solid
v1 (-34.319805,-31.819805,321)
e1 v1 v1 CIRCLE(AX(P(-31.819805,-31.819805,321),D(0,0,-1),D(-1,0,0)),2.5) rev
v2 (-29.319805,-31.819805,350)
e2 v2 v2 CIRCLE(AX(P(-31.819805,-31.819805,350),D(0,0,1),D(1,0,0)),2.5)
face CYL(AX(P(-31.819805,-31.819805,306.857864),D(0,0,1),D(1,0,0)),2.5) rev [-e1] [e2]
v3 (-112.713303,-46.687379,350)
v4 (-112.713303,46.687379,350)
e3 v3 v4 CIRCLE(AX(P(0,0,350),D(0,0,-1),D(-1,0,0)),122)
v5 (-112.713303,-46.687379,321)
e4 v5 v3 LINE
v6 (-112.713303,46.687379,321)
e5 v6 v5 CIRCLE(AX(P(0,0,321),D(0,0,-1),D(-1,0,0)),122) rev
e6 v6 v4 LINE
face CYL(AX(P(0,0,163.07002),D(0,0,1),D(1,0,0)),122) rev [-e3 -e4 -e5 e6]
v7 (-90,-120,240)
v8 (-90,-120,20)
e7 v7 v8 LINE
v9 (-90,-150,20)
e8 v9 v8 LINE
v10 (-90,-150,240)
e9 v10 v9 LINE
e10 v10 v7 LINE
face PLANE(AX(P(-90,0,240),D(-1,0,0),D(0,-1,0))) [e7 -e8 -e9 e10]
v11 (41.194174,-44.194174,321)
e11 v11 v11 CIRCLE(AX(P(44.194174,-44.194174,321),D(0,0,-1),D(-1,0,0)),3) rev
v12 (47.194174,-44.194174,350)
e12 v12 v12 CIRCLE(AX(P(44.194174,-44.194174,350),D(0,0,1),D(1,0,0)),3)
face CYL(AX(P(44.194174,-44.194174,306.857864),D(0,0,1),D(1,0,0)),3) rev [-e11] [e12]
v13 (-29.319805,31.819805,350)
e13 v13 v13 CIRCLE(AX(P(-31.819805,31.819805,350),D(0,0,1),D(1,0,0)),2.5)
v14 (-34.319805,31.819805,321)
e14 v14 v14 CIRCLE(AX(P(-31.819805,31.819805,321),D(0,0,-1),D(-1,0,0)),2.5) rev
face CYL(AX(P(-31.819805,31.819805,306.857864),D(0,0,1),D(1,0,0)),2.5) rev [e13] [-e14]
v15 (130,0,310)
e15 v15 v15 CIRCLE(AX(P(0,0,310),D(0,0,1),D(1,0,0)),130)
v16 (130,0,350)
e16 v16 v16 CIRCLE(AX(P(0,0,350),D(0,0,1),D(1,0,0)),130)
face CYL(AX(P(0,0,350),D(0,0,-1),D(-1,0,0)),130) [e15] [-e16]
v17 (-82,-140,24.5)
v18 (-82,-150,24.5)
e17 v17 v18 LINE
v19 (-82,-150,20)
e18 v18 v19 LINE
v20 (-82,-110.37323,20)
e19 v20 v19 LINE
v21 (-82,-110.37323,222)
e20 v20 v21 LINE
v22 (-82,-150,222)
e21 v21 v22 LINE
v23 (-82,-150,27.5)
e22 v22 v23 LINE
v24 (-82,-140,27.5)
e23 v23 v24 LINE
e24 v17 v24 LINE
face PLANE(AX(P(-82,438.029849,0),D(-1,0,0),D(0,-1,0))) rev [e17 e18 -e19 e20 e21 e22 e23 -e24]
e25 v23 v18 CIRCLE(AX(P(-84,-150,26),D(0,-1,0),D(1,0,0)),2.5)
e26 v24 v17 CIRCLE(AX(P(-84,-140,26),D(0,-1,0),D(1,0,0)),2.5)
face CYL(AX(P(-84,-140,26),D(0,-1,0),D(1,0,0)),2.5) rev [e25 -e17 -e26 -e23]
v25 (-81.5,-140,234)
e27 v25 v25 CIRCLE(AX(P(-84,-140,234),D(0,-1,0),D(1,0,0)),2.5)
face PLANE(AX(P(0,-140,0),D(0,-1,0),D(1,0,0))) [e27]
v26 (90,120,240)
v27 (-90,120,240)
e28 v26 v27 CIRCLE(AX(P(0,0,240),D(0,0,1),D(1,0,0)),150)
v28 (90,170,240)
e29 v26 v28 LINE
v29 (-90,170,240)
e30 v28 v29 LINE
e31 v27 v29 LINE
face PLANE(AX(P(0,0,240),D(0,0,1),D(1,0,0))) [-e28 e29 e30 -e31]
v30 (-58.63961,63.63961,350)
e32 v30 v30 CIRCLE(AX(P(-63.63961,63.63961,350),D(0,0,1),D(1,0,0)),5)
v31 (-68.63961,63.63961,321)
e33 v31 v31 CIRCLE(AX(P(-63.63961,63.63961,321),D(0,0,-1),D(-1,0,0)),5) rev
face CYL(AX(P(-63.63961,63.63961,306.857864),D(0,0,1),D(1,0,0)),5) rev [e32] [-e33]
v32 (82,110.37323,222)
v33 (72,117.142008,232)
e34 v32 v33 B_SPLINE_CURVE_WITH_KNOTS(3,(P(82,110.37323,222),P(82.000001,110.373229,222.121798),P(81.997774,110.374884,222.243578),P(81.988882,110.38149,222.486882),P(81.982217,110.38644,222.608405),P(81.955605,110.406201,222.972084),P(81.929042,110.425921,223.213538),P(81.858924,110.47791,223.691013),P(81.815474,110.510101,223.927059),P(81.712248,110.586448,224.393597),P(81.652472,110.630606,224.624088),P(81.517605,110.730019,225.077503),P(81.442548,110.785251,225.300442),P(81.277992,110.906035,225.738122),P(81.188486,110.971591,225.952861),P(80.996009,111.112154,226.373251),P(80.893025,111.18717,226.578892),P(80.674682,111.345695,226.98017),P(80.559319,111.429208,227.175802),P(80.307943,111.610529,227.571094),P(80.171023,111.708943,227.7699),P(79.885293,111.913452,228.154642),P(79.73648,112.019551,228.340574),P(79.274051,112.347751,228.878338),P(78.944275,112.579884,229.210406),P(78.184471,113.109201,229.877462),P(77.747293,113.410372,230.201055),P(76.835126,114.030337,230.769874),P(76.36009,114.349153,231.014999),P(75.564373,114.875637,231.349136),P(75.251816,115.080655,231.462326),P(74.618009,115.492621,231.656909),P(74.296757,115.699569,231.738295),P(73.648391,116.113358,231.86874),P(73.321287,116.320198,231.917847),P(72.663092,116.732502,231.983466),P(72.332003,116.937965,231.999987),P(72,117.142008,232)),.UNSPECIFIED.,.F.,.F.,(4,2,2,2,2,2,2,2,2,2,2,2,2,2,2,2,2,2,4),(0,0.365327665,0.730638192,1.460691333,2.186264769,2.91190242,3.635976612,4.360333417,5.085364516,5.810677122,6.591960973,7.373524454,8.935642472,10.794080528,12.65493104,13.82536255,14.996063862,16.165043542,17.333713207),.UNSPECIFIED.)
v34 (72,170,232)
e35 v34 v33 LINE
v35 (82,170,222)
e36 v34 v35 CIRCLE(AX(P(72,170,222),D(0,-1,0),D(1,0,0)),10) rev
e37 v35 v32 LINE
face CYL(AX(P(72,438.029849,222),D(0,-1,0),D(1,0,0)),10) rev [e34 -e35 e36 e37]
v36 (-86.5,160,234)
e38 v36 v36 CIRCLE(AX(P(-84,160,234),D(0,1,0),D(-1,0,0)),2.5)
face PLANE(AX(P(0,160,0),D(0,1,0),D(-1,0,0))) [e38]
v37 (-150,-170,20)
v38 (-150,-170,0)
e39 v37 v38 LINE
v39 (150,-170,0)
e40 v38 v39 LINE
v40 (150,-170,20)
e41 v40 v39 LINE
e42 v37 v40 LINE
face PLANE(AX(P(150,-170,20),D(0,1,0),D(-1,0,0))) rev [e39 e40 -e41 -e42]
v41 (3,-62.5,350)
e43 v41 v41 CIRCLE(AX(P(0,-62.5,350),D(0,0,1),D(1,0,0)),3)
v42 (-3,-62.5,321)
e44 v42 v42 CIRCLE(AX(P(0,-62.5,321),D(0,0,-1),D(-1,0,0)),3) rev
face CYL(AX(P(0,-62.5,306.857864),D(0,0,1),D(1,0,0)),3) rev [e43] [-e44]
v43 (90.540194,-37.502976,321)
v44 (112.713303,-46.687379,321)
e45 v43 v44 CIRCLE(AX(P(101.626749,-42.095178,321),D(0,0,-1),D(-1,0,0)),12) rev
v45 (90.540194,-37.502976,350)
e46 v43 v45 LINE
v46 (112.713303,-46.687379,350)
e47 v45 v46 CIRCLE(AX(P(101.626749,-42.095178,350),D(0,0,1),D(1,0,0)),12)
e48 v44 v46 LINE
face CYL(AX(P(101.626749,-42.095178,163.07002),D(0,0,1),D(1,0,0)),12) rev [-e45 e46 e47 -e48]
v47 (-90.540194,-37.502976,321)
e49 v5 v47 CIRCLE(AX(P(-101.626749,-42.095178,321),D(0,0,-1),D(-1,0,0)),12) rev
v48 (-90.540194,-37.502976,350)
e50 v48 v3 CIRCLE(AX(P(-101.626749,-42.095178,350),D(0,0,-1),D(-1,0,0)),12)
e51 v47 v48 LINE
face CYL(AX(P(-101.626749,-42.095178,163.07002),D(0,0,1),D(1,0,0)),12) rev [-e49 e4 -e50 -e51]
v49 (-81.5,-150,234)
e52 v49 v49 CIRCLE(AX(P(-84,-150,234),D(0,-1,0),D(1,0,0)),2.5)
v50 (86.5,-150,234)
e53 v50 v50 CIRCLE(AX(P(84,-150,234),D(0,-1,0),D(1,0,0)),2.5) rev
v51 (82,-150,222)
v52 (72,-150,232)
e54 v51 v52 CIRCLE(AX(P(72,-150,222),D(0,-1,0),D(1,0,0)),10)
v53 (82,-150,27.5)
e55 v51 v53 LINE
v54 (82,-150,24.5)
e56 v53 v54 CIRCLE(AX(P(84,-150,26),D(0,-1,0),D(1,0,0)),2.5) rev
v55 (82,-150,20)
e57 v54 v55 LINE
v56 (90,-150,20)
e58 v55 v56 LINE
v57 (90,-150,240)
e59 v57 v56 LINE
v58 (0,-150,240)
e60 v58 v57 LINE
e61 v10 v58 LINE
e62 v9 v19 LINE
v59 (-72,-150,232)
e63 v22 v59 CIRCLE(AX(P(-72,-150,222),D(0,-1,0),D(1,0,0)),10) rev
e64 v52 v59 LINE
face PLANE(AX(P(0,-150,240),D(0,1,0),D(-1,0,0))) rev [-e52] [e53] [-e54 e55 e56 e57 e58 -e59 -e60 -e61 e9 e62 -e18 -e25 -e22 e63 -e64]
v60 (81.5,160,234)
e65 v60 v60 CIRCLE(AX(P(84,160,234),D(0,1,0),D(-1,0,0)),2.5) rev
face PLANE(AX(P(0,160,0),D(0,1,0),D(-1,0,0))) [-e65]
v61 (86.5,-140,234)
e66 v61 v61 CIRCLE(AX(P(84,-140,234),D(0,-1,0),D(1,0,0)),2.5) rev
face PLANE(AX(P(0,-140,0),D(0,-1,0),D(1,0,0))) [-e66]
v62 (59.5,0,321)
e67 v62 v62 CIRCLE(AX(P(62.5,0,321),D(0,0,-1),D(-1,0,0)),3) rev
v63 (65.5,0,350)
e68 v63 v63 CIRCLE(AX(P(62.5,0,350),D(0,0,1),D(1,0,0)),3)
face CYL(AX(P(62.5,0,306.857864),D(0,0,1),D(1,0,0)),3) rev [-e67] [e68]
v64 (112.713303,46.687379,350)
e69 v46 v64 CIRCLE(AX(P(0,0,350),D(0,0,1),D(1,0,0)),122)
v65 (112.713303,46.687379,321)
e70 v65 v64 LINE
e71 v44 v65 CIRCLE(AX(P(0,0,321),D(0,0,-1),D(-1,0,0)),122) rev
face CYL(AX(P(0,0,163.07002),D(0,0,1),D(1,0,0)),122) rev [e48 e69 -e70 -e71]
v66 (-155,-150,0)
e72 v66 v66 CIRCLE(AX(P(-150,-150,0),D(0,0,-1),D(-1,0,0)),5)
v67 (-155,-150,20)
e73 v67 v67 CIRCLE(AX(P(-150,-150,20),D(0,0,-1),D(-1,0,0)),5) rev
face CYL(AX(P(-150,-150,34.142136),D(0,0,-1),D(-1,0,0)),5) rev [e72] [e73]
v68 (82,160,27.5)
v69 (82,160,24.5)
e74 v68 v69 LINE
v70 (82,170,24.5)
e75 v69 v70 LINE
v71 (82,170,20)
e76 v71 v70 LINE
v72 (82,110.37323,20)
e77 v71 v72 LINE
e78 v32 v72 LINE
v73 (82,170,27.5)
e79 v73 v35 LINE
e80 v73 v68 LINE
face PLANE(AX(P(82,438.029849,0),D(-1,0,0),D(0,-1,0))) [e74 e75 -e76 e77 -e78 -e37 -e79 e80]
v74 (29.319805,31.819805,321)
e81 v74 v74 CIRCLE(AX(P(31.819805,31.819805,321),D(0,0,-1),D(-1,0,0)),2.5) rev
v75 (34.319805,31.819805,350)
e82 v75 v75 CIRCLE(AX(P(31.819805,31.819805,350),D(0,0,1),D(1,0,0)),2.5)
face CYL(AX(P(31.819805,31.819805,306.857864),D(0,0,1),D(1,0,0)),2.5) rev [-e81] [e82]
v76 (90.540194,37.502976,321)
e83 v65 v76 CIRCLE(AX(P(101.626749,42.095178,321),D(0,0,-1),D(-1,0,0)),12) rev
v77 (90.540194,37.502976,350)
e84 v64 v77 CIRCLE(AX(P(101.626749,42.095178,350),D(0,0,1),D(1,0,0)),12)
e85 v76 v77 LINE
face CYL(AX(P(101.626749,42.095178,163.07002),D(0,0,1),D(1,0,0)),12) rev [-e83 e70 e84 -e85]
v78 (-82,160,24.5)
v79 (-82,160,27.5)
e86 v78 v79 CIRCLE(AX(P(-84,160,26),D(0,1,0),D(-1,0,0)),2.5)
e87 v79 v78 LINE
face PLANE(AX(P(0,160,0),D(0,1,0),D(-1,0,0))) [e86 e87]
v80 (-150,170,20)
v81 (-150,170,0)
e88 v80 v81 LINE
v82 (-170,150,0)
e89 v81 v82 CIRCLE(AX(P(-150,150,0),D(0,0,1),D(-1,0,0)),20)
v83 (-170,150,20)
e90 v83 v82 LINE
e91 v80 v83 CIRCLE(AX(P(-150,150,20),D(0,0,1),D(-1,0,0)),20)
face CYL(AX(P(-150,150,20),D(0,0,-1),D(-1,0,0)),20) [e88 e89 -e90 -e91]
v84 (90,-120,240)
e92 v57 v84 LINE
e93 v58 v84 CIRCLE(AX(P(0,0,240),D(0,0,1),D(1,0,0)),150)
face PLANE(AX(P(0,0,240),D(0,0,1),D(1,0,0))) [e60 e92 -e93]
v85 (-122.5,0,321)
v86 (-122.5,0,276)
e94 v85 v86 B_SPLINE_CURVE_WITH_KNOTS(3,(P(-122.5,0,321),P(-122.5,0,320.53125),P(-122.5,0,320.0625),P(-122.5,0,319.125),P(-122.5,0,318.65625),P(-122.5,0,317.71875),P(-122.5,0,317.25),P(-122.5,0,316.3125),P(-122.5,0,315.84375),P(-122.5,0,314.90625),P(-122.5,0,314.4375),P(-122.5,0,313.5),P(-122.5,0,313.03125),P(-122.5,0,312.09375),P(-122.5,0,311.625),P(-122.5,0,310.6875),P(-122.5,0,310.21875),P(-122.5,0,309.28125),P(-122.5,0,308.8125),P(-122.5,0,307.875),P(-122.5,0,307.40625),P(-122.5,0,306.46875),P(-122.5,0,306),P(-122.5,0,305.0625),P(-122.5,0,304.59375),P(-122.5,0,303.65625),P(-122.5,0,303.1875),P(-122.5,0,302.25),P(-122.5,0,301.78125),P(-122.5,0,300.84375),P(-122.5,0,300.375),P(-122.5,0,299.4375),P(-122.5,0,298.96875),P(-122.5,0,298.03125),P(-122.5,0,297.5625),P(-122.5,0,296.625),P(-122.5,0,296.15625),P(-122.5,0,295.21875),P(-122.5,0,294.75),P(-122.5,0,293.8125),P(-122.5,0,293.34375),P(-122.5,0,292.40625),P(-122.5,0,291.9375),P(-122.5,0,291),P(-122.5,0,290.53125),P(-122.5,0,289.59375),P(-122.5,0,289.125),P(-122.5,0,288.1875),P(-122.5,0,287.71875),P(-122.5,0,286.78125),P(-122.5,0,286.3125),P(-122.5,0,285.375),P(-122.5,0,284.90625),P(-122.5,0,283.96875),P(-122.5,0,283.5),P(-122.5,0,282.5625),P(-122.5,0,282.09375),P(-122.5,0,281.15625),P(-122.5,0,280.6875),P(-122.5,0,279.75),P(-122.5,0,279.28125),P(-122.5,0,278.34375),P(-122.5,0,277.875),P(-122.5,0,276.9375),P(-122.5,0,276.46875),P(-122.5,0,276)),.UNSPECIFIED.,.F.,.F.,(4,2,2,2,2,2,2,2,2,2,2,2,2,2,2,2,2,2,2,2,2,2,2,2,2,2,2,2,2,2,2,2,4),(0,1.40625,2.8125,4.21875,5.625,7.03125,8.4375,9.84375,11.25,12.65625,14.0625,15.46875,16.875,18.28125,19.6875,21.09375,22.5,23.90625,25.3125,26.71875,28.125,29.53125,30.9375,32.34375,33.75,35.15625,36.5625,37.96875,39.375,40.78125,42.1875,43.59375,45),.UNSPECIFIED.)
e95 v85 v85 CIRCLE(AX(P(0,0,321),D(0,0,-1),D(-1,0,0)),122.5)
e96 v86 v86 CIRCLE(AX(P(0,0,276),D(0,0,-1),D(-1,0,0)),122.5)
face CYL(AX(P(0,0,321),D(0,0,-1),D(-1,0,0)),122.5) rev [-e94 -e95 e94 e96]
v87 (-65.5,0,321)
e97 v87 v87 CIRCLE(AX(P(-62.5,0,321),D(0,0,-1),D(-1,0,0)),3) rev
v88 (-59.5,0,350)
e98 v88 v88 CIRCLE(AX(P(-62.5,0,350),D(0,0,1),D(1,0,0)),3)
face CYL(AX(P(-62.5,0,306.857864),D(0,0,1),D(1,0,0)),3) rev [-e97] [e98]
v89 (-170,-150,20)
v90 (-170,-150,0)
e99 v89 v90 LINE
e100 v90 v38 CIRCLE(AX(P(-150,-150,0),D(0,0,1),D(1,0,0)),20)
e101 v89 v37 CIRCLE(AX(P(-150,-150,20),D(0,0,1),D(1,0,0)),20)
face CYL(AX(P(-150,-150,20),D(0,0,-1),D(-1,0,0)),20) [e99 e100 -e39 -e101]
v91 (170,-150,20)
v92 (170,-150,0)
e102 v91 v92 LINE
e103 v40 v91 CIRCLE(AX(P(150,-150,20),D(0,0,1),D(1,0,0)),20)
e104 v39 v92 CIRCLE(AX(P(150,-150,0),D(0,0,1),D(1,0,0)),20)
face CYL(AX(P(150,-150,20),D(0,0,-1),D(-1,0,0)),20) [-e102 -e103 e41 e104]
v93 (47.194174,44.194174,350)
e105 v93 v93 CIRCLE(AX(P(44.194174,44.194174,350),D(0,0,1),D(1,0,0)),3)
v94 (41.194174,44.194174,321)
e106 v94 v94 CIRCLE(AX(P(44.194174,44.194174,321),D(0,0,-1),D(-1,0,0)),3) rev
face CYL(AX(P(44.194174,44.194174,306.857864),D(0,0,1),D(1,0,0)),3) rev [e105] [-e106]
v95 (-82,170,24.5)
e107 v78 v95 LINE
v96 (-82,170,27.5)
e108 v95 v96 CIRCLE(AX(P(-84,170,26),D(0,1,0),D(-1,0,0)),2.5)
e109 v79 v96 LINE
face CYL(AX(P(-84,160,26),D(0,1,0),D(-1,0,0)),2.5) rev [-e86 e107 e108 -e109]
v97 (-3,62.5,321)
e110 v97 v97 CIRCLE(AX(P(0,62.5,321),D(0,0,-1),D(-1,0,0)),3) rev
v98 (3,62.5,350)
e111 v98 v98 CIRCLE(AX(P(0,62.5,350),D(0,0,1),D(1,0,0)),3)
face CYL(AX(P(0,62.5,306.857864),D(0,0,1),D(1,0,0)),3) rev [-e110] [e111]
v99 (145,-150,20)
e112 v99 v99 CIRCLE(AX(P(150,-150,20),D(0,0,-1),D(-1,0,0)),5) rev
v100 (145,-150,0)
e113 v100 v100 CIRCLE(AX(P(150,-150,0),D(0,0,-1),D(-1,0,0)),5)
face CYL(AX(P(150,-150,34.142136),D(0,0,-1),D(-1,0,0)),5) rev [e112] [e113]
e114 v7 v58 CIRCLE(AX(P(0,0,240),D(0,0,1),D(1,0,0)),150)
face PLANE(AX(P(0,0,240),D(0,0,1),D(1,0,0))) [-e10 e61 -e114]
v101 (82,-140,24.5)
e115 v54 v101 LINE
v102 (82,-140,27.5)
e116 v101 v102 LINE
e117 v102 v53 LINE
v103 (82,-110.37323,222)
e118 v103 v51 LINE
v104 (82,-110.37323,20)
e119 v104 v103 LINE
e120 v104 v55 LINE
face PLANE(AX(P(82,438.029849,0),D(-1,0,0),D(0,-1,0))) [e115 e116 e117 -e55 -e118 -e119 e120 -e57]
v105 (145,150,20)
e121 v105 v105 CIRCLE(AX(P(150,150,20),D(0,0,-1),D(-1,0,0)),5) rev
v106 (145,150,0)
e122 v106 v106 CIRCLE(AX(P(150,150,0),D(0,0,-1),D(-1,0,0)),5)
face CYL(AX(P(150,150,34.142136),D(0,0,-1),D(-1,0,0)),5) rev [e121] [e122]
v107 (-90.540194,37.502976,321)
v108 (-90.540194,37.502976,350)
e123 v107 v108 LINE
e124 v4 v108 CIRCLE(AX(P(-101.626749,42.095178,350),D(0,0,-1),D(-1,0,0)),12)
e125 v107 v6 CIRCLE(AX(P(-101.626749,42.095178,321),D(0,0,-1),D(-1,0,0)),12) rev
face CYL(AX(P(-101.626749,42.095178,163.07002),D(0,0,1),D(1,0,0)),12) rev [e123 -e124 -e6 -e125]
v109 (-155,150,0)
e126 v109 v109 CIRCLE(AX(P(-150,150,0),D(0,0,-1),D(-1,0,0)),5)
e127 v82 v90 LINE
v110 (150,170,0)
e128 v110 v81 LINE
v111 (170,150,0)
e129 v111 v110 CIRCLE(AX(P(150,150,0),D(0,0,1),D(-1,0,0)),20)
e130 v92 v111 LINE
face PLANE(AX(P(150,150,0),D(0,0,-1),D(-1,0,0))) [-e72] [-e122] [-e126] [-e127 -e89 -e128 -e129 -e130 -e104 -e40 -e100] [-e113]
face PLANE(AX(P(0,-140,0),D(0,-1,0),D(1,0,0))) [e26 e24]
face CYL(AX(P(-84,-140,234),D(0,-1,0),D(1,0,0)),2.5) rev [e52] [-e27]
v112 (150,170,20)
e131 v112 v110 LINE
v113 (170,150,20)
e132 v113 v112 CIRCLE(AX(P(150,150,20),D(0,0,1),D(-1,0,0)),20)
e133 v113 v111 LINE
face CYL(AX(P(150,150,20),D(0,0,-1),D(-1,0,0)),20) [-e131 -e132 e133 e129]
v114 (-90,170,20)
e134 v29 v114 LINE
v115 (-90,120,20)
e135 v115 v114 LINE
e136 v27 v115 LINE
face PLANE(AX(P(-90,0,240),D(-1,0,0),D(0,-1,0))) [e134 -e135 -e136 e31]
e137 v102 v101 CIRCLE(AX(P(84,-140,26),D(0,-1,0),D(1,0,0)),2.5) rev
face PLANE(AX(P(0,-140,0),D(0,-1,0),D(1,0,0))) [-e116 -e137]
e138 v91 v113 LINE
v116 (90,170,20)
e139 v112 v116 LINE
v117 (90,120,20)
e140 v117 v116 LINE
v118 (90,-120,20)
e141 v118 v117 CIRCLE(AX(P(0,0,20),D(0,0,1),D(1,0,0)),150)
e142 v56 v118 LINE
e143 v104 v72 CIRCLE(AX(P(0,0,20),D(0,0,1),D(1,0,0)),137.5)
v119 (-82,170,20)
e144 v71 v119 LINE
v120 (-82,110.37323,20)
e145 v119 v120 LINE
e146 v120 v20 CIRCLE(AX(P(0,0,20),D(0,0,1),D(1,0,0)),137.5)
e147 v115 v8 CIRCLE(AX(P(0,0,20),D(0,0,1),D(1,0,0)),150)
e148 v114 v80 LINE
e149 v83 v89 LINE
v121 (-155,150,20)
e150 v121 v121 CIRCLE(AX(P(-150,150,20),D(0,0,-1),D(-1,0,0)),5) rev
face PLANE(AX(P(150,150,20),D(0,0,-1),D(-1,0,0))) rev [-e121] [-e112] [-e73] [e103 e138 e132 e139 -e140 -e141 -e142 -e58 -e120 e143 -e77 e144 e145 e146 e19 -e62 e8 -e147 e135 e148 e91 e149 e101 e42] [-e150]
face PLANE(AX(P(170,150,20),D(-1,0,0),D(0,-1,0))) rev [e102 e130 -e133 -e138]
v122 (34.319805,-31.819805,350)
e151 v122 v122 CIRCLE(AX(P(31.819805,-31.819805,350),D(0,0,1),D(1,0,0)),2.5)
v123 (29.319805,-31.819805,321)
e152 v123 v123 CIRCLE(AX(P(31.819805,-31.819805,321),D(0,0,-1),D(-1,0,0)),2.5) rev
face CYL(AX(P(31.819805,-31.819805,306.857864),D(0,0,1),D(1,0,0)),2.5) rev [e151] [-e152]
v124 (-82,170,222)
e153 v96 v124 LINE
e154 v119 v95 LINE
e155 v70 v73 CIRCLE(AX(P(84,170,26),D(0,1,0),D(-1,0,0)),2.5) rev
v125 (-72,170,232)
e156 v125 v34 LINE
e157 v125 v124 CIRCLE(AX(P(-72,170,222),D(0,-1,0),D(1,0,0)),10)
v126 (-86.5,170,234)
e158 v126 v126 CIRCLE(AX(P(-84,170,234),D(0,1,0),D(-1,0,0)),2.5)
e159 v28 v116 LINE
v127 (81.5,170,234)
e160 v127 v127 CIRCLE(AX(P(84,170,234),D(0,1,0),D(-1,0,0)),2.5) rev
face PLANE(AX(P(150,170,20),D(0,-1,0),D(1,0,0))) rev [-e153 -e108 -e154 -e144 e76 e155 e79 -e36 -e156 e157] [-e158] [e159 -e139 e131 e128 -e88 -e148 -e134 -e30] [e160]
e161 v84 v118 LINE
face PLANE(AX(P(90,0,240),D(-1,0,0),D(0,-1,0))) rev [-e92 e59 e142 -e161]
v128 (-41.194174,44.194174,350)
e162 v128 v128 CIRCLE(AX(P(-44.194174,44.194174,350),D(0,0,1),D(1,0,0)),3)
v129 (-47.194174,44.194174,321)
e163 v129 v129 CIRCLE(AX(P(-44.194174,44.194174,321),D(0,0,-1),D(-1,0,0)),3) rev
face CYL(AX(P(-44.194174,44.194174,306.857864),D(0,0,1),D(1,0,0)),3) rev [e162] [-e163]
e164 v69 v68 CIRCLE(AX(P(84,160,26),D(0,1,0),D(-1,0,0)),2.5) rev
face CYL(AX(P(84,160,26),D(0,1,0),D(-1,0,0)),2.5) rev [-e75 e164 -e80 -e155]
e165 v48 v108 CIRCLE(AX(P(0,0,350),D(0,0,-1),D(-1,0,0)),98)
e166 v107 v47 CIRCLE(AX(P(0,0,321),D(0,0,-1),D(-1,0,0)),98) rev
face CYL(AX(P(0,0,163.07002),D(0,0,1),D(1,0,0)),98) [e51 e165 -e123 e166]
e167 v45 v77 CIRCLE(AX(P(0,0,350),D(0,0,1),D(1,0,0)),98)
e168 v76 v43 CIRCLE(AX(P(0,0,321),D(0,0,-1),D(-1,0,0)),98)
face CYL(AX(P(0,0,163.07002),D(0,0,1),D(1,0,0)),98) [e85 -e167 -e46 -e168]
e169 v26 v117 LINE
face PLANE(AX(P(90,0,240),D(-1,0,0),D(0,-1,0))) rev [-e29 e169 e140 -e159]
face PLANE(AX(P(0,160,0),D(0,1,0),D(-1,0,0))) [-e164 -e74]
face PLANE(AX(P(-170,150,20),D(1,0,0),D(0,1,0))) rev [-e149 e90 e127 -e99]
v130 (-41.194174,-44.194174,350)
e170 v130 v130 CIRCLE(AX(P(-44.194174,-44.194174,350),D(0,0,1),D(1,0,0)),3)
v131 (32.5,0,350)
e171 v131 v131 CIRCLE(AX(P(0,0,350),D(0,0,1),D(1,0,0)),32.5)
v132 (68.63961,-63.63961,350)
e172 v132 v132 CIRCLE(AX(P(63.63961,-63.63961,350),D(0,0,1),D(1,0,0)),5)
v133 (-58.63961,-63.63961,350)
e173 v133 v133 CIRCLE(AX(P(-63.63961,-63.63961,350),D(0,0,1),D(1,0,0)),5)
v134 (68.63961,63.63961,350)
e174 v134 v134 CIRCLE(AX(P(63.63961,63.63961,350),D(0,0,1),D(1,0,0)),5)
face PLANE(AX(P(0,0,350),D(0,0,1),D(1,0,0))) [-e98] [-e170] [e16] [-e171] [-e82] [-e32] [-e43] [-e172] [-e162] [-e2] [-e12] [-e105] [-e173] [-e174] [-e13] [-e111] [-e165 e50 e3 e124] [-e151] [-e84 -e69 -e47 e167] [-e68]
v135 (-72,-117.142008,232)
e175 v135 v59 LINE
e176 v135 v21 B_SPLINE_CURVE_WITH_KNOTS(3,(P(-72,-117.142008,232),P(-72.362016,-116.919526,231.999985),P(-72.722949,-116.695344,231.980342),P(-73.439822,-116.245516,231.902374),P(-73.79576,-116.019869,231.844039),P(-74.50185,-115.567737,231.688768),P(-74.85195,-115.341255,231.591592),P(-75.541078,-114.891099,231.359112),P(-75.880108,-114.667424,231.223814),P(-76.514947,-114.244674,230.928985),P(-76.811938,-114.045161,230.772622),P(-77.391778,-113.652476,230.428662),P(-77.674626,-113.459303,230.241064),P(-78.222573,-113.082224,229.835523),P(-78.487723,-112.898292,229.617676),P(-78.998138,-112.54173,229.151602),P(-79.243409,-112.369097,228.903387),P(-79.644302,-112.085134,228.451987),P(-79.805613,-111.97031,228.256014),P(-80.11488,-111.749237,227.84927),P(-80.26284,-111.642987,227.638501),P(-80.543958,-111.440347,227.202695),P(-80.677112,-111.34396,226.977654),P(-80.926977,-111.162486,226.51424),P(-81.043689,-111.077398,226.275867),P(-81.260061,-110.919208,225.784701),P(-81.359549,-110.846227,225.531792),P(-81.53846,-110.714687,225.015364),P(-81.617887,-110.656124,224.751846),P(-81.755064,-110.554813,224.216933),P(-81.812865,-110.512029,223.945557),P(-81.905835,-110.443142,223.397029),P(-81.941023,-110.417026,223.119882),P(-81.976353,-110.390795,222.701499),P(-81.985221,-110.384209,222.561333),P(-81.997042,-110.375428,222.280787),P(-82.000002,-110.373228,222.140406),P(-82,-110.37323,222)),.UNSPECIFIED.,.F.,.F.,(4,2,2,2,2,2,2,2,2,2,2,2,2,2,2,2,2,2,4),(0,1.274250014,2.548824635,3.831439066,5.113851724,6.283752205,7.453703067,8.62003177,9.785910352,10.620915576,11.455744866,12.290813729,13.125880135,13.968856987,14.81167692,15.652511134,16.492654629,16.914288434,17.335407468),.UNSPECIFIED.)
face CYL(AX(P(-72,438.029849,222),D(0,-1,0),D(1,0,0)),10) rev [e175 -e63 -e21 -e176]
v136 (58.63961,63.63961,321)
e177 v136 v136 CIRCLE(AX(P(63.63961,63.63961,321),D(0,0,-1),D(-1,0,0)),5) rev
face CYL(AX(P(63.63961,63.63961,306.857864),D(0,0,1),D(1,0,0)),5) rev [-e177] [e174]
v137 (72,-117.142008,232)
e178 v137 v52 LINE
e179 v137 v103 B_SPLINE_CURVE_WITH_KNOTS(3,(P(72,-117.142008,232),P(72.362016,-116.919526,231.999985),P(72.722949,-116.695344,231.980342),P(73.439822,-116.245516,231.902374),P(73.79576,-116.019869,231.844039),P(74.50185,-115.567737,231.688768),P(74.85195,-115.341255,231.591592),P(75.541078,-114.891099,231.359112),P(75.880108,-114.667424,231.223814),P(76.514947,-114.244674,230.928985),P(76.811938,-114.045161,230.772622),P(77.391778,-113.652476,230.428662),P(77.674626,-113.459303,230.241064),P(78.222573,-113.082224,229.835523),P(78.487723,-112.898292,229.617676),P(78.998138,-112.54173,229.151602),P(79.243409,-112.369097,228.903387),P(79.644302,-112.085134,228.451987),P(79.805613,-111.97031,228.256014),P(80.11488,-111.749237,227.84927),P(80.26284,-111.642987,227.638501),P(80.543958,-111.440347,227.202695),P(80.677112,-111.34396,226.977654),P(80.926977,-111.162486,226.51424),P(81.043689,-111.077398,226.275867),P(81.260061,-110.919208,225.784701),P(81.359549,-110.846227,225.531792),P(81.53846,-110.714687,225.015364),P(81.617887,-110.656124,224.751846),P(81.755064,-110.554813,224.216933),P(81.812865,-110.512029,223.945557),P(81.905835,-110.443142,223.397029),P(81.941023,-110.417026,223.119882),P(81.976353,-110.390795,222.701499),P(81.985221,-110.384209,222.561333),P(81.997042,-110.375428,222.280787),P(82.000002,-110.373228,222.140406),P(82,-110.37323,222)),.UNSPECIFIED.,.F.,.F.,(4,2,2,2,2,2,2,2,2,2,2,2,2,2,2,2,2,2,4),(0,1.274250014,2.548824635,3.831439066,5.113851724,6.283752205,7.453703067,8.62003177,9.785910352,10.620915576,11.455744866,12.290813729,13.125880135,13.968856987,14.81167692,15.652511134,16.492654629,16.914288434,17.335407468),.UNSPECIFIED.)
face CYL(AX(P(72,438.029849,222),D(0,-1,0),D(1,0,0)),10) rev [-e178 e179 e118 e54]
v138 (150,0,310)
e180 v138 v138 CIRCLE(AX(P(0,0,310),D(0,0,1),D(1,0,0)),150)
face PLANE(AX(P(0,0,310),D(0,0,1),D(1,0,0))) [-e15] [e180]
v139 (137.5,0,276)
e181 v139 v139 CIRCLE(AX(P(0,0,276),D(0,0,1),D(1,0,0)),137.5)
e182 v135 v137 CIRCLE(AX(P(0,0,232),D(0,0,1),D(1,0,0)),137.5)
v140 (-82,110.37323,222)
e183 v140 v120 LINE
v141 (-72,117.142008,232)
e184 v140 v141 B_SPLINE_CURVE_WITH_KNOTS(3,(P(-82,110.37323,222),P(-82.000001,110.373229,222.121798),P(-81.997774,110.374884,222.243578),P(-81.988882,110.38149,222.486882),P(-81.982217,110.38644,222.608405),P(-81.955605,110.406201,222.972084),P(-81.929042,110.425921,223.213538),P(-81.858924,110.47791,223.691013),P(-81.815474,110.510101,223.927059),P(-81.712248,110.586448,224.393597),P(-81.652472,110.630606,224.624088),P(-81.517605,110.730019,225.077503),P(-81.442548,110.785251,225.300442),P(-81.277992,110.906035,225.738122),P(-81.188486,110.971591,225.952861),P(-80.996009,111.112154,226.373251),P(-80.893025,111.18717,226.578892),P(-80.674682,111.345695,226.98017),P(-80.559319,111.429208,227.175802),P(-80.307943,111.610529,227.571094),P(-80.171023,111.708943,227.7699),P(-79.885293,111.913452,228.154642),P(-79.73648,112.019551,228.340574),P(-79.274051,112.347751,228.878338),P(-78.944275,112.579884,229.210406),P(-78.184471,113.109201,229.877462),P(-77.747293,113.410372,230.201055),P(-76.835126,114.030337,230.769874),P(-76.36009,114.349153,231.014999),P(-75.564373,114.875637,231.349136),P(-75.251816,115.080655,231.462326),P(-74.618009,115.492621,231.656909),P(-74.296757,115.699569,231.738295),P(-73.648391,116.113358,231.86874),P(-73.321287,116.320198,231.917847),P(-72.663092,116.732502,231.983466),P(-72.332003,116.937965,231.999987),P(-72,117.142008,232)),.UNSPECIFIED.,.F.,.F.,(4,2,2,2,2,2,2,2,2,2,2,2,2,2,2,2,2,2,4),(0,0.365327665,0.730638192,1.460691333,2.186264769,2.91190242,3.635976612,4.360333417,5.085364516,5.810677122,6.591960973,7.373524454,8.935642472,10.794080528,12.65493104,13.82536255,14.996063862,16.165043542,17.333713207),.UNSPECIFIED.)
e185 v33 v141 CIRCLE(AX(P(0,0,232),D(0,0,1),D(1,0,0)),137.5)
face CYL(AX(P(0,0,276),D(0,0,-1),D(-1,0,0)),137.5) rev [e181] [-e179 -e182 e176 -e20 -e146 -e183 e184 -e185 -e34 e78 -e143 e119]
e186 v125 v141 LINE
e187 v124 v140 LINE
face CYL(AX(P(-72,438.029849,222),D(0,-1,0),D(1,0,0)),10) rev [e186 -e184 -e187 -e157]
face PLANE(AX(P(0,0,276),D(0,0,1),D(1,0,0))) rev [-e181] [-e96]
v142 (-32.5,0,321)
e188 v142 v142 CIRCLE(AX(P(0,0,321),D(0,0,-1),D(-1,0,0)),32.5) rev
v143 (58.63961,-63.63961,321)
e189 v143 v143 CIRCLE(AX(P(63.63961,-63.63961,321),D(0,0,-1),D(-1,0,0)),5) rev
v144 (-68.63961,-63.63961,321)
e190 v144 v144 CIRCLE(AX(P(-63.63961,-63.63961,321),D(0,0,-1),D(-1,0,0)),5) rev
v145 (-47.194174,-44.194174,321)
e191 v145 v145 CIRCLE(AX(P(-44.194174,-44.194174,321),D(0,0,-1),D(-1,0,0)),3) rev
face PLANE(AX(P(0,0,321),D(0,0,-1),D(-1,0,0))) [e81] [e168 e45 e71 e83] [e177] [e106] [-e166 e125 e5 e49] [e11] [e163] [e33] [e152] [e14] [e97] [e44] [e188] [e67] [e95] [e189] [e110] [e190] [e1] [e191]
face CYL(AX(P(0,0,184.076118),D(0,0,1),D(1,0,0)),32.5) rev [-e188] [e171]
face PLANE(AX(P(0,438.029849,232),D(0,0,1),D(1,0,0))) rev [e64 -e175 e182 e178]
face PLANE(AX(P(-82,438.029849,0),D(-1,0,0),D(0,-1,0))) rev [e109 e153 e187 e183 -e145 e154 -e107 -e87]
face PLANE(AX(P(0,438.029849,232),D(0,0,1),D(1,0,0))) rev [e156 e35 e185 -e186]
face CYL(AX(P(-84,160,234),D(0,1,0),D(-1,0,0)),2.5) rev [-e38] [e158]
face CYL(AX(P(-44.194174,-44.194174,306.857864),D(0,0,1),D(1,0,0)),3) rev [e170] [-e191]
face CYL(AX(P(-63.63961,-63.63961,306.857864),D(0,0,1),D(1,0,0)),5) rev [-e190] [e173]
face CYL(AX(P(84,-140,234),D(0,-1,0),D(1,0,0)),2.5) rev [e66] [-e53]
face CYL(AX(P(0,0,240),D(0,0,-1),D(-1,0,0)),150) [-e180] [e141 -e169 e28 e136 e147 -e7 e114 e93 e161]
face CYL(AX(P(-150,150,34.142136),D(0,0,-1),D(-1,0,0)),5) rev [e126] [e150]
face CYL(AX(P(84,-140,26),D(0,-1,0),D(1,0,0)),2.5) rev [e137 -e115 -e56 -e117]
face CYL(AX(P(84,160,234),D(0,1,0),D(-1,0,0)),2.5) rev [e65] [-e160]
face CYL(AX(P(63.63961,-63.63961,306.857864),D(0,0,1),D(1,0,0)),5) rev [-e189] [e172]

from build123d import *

# Parameters (mm, degrees)
BOSS_EXTRUDE1_DEPTH   = 20
BOSS_EXTRUDE2_DEPTH   = 220
BOSS_EXTRUDE3_DEPTH   = 70
SKETCH4_R             = 130
BOSS_EXTRUDE4_DEPTH   = 40
SKETCH18_R            = 137.5
CUT_EXTRUDE6_DEPTH    = 256
BODY_MOVE_COPY1_ANGLE = 90
BODY_MOVE_COPY2_ANGLE = 90
BODY_MOVE_COPY3_ANGLE = 180
SKETCH19_R            = 32.5
CUT_EXTRUDE7_DEPTH    = 74
CUT_EXTRUDE8_DEPTH    = 20
CUT_EXTRUDE11_START   = -74
CUT_EXTRUDE11_DEPTH   = 74
SKETCH29_R            = 122.5
SKETCH29_R_2          = 32.5
CUT_EXTRUDE12_DEPTH   = 45
CUT_EXTRUDE13_START   = -320
CUT_EXTRUDE13_DEPTH   = 320
SKETCH35_R            = 2.5
CUT_EXTRUDE14_DEPTH   = 10
CUT_EXTRUDE15_START   = -10
SKETCH36_R            = 2.5
CUT_EXTRUDE15_DEPTH   = 10
SKETCH37_R            = 5
SKETCH37_R_2          = 3
SKETCH37_R_3          = 2.5
CUT_EXTRUDE16_DEPTH   = 29


# Read off the part's stored shape, not the designer's step: Cut-Extrude13
with BuildPart() as part:
    # Sketch1 → Boss-Extrude1 (new body)
    with BuildSketch(Plane(origin=(0, 0, 0), x_dir=(1, 0, 0), z_dir=(0, 1, 0))):
        with BuildLine():
            Line((150, -170), (-150, -170))
            ThreePointArc((-150, -170), (-164.142135624, -164.142135624), (-170, -150))
            Line((-170, -150), (-170, 150))
            ThreePointArc((-170, 150), (-164.142135624, 164.142135624), (-150, 170))
            Line((-150, 170), (150, 170))
            ThreePointArc((150, 170), (164.142135624, 164.142135624), (170, 150))
            Line((170, 150), (170, -150))
            ThreePointArc((170, -150), (164.142135624, -164.142135624), (150, -170))
        make_face()
    extrude(amount=BOSS_EXTRUDE1_DEPTH)

    # Sketch2 → Boss-Extrude2 (add)
    with BuildSketch(Plane(origin=(0, 20, 0), x_dir=(1, 0, 0), z_dir=(0, 1, 0))):
        with BuildLine():
            Line((170, -90), (170, 90))
            Line((170, 90), (120, 90))
            ThreePointArc((120, 90), (0, 150), (-120, 90))
            Line((-120, 90), (-150, 90))
            Line((-150, 90), (-150, -90))
            Line((-150, -90), (-120, -90))
            ThreePointArc((-120, -90), (0, -150), (120, -90))
            Line((120, -90), (170, -90))
        make_face()
    extrude(amount=BOSS_EXTRUDE2_DEPTH)

    # Sketch3 → Boss-Extrude3 (add)
    with BuildSketch(Plane(origin=(0, 240, 0), x_dir=(1, 0, 0), z_dir=(0, 1, 0))):
        with BuildLine():
            ThreePointArc((-120, -90), (0, -150), (120, -90))
            ThreePointArc((120, -90), (142.302494708, -47.434164903), (150, 0))
            ThreePointArc((150, 0), (142.302494708, 47.434164903), (120, 90))
            ThreePointArc((120, 90), (0, 150), (-120, 90))
            ThreePointArc((-120, 90), (-142.302494685, 47.43416497), (-150, 1.43e-07))
            ThreePointArc((-150, 1.43e-07), (-142.30249473, -47.434164835), (-120, -90))
        make_face()
    extrude(amount=BOSS_EXTRUDE3_DEPTH)

    # Sketch4 → Boss-Extrude4 (add)
    with BuildSketch(Plane(origin=(0, 310, 0), x_dir=(1, 0, 0), z_dir=(0, 1, 0))):
        with Locations(Location((0, 0, 0), (0, 0, 270))):
            Circle(SKETCH4_R)
    extrude(amount=BOSS_EXTRUDE4_DEPTH)

    # Sketch18 → Cut-Extrude6 (cut)
    with BuildSketch(Plane(origin=(0, 20, 0), x_dir=(1, 0, 0), z_dir=(0, 1, 0))):
        with Locations(Location((0, 0, 0), (0, 0, 270))):
            Circle(SKETCH18_R)
    extrude(amount=CUT_EXTRUDE6_DEPTH, mode=Mode.SUBTRACT)


with BuildPart() as part_1:
    # Body-Move/Copy1: moved
    add(part.part.rotate(Axis((0, 0, 0), (1, 0, 0)), BODY_MOVE_COPY1_ANGLE))


with BuildPart() as part_2:
    # Body-Move/Copy2: moved
    add(part_1.part.rotate(Axis((0, 0, 0), (0, 0, -1)), BODY_MOVE_COPY2_ANGLE))


with BuildPart() as part_3:
    # Body-Move/Copy3: moved
    add(part_2.part.rotate(Axis((0, 0, 0), (0, 0, 1)), BODY_MOVE_COPY3_ANGLE))

    # Sketch19 → Cut-Extrude7 (cut)
    with BuildSketch(Plane.XY.offset(350)):
        Circle(SKETCH19_R)
    extrude(amount=-CUT_EXTRUDE7_DEPTH, mode=Mode.SUBTRACT)

    # Sketch20 → Cut-Extrude8 (cut)
    with BuildSketch(Plane(origin=(0, 0, 0), x_dir=(-1, 0, 0), z_dir=(0, 0, -1))):
        with BuildLine():
            ThreePointArc((155, -150), (153.535533906, -146.464466094), (150, -145))
            Line((150, -145), (150, -150))
            Line((150, -150), (145, -150))
            ThreePointArc((145, -150), (150, -155), (155, -150))
        make_face()
        with BuildLine():
            Line((150, -150), (150, -145))
            ThreePointArc((150, -145), (146.464466094, -146.464466094), (145, -150))
            Line((145, -150), (150, -150))
        make_face()
        with BuildLine():
            ThreePointArc((155, -150), (153.535533906, -146.464466094), (150, -145))
            Line((150, -145), (150, -150))
            Line((150, -150), (145, -150))
            ThreePointArc((145, -150), (150, -155), (155, -150))
        make_face()
        with BuildLine():
            Line((150, -150), (150, -145))
            ThreePointArc((150, -145), (146.464466094, -146.464466094), (145, -150))
            Line((145, -150), (150, -150))
        make_face()
        with BuildLine():
            ThreePointArc((-145, -150), (-146.464466094, -146.464466094), (-150, -145))
            Line((-150, -145), (-150, -150))
            Line((-150, -150), (-145, -150))
        make_face()
        with BuildLine():
            Line((-150, -150), (-150, -145))
            ThreePointArc((-150, -145), (-153.535533906, -153.535533906), (-145, -150))
            Line((-145, -150), (-150, -150))
        make_face()
        with BuildLine():
            ThreePointArc((-145, -150), (-146.464466094, -146.464466094), (-150, -145))
            Line((-150, -145), (-150, -150))
            Line((-150, -150), (-145, -150))
        make_face()
        with BuildLine():
            Line((-150, -150), (-150, -145))
            ThreePointArc((-150, -145), (-153.535533906, -153.535533906), (-145, -150))
            Line((-145, -150), (-150, -150))
        make_face()
        with BuildLine():
            Line((-150, 145), (-150, 150))
            Line((-150, 150), (-145, 150))
            ThreePointArc((-145, 150), (-153.535533906, 153.535533906), (-150, 145))
        make_face()
        with BuildLine():
            Line((-145, 150), (-150, 150))
            Line((-150, 150), (-150, 145))
            ThreePointArc((-150, 145), (-146.464466094, 146.464466094), (-145, 150))
        make_face()
        with BuildLine():
            Line((-150, 145), (-150, 150))
            Line((-150, 150), (-145, 150))
            ThreePointArc((-145, 150), (-153.535533906, 153.535533906), (-150, 145))
        make_face()
        with BuildLine():
            Line((-145, 150), (-150, 150))
            Line((-150, 150), (-150, 145))
            ThreePointArc((-150, 145), (-146.464466094, 146.464466094), (-145, 150))
        make_face()
        with BuildLine():
            ThreePointArc((155, 150), (150, 155), (145, 150))
            Line((145, 150), (150, 150))
            Line((150, 150), (150, 145))
            ThreePointArc((150, 145), (153.535533906, 146.464466094), (155, 150))
        make_face()
        with BuildLine():
            Line((150, 150), (145, 150))
            ThreePointArc((145, 150), (146.464466094, 146.464466094), (150, 145))
            Line((150, 145), (150, 150))
        make_face()
        with BuildLine():
            ThreePointArc((155, 150), (150, 155), (145, 150))
            Line((145, 150), (150, 150))
            Line((150, 150), (150, 145))
            ThreePointArc((150, 145), (153.535533906, 146.464466094), (155, 150))
        make_face()
        with BuildLine():
            Line((150, 150), (145, 150))
            ThreePointArc((145, 150), (146.464466094, 146.464466094), (150, 145))
            Line((150, 145), (150, 150))
        make_face()
    extrude(amount=-CUT_EXTRUDE8_DEPTH, mode=Mode.SUBTRACT)

    # Sketch26 → Cut-Extrude11 (cut)
    with BuildSketch(Plane.XY.offset(350).offset(CUT_EXTRUDE11_START)):
        with BuildLine():
            ThreePointArc((90.540194176, 37.502976396), (98, -2.47e-07), (90.540193987, -37.502976852))
            ThreePointArc((90.540193987, -37.502976852), (97.034547528, -53.181732008), (112.713302884, -46.687378949))
            ThreePointArc((112.713302884, -46.687378949), (122, -4.91e-07), (112.713303259, 46.687378042))
            ThreePointArc((112.713303259, 46.687378042), (97.034547753, 53.181732102), (90.540194176, 37.502976396))
        make_face()
    cut_extrude11 = extrude(amount=CUT_EXTRUDE11_DEPTH, mode=Mode.SUBTRACT)

    # Sketch29 → Cut-Extrude12 (cut)
    # profile 1 of 2: a face of its own
    with BuildSketch(Plane(origin=(0, 0, 276), x_dir=(-1, 0, 0), z_dir=(0, 0, -1))):
        Circle(SKETCH29_R)
        with Locations(Location((0, 0, 0), (0, 0, 180))):
            Circle(SKETCH29_R_2, mode=Mode.SUBTRACT)
    # profile 2 of 2: a face of its own
    with BuildSketch(Plane(origin=(0, 0, 276), x_dir=(-1, 0, 0), z_dir=(0, 0, -1))):
        with BuildLine():
            ThreePointArc((-90.540194186, 37.502976372), (-98, 0), (-90.540194186, -37.502976372))
            ThreePointArc((-90.540194186, -37.502976372), (-97.034547388, -53.18173195), (-112.713302966, -46.687378749))
            ThreePointArc((-112.713302966, -46.687378749), (-122, 0), (-112.713302966, 46.687378749))
            ThreePointArc((-112.713302966, 46.687378749), (-97.034547388, 53.18173195), (-90.540194186, 37.502976372))
        make_face()
    extrude(amount=-CUT_EXTRUDE12_DEPTH, mode=Mode.SUBTRACT)

    # Mirror1: Cut-Extrude11 across plane
    add(cut_extrude11.mirror(Plane(origin=(0, 0, 0), x_dir=(0, 0, 1), z_dir=(1, 0, 0))), mode=Mode.SUBTRACT)

    # Cut-Extrude13 outline → Cut-Extrude13 (cut)
    with BuildSketch(Plane.XZ.offset(150).offset(CUT_EXTRUDE13_START)):
        with BuildLine():
            Line((-82, 222), (-82, 20))
            Line((-82, 20), (82, 20))
            Line((82, 20), (82, 222))
            ThreePointArc((82, 222), (79.071067812, 229.071067812), (72, 232))
            Line((72, 232), (-72, 232))
            ThreePointArc((-72, 232), (-79.071067812, 229.071067812), (-82, 222))
        make_face()
    extrude(amount=CUT_EXTRUDE13_DEPTH, mode=Mode.SUBTRACT)

    # Sketch35 → Cut-Extrude14 (cut)
    with BuildSketch(Plane(origin=(0, 170, 0), x_dir=(1, 0, 0), z_dir=(0, 1, 0))):
        with Locations(Location((-84, -234, 0), (0, 0, 180))):
            Circle(SKETCH35_R)
        with Locations((-84, -26)):
            Circle(SKETCH35_R)
        with Locations((84, -26)):
            Circle(SKETCH35_R)
        with Locations(Location((84, -234, 0), (0, 0, 180))):
            Circle(SKETCH35_R)
    extrude(amount=-CUT_EXTRUDE14_DEPTH, mode=Mode.SUBTRACT)

    # Sketch36 → Cut-Extrude15 (cut)
    with BuildSketch(Plane.XZ.offset(150).offset(CUT_EXTRUDE15_START)):
        with BuildLine():
            ThreePointArc((-81.5, 234), (-82.232233047, 235.767766953), (-84, 236.5))
            Line((-84, 236.5), (-84, 234))
            Line((-84, 234), (-86.5, 234))
            ThreePointArc((-86.5, 234), (-84, 231.5), (-81.5, 234))
        make_face()
        with BuildLine():
            Line((-84, 234), (-84, 236.5))
            ThreePointArc((-84, 236.5), (-85.767766953, 235.767766953), (-86.5, 234))
            Line((-86.5, 234), (-84, 234))
        make_face()
        with BuildLine():
            ThreePointArc((-81.5, 234), (-82.232233047, 235.767766953), (-84, 236.5))
            Line((-84, 236.5), (-84, 234))
            Line((-84, 234), (-86.5, 234))
            ThreePointArc((-86.5, 234), (-84, 231.5), (-81.5, 234))
        make_face()
        with BuildLine():
            Line((-84, 234), (-84, 236.5))
            ThreePointArc((-84, 236.5), (-85.767766953, 235.767766953), (-86.5, 234))
            Line((-86.5, 234), (-84, 234))
        make_face()
        with Locations(Location((84, 234, 0), (0, 0, 180))):
            Circle(SKETCH36_R)
        with BuildLine():
            ThreePointArc((82, 27.5), (81.5, 26), (82, 24.5))
            Line((82, 24.5), (82, 27.5))
        make_face()
        with BuildLine():
            Line((82, 27.5), (82, 24.5))
            ThreePointArc((82, 24.5), (84.790569415, 23.628291755), (86.5, 26))
            ThreePointArc((86.5, 26), (84.790569415, 28.371708245), (82, 27.5))
        make_face()
        with BuildLine():
            ThreePointArc((82, 27.5), (81.5, 26), (82, 24.5))
            Line((82, 24.5), (82, 27.5))
        make_face()
        with BuildLine():
            Line((82, 27.5), (82, 24.5))
            ThreePointArc((82, 24.5), (84.790569415, 23.628291755), (86.5, 26))
            ThreePointArc((86.5, 26), (84.790569415, 28.371708245), (82, 27.5))
        make_face()
        with BuildLine():
            ThreePointArc((-82, 27.5), (-84.790569415, 28.371708245), (-86.5, 26))
            Line((-86.5, 26), (-84, 26))
            Line((-84, 26), (-84, 23.5))
            ThreePointArc((-84, 23.5), (-82.881966011, 23.763932022), (-82, 24.5))
            Line((-82, 24.5), (-82, 27.5))
        make_face()
        with BuildLine():
            Line((-84, 26), (-86.5, 26))
            ThreePointArc((-86.5, 26), (-85.767766953, 24.232233047), (-84, 23.5))
            Line((-84, 23.5), (-84, 26))
        make_face()
        with BuildLine():
            ThreePointArc((-81.5, 26), (-81.628291755, 26.790569415), (-82, 27.5))
            Line((-82, 27.5), (-82, 24.5))
            ThreePointArc((-82, 24.5), (-81.628291755, 25.209430585), (-81.5, 26))
        make_face()
    extrude(amount=CUT_EXTRUDE15_DEPTH, mode=Mode.SUBTRACT)

    # Sketch37 → Cut-Extrude16 (cut)
    with BuildSketch(Plane.XY.offset(350)):
        with Locations((63.639610307, -63.639610307)):
            Circle(SKETCH37_R)
        with Locations((44.194173824, -44.194173824)):
            Circle(SKETCH37_R_2)
        with Locations((31.819805153, -31.819805153)):
            Circle(SKETCH37_R_3)
        with Locations((-63.639610307, -63.639610307)):
            Circle(SKETCH37_R)
        with Locations((-63.639610307, 63.639610307)):
            Circle(SKETCH37_R)
        with Locations((63.639610307, 63.639610307)):
            Circle(SKETCH37_R)
        with Locations((0, -62.5)):
            Circle(SKETCH37_R_2)
        with Locations((-44.194173824, -44.194173824)):
            Circle(SKETCH37_R_2)
        with Locations((-62.5, 0)):
            Circle(SKETCH37_R_2)
        with Locations((-44.194173824, 44.194173824)):
            Circle(SKETCH37_R_2)
        with Locations((0, 62.5)):
            Circle(SKETCH37_R_2)
        with Locations((44.194173824, 44.194173824)):
            Circle(SKETCH37_R_2)
        with Locations((62.5, 0)):
            Circle(SKETCH37_R_2)
        with Locations((-31.819805153, -31.819805153)):
            Circle(SKETCH37_R_3)
        with Locations((-31.819805153, 31.819805153)):
            Circle(SKETCH37_R_3)
        with Locations((31.819805153, 31.819805153)):
            Circle(SKETCH37_R_3)
    extrude(amount=-CUT_EXTRUDE16_DEPTH, mode=Mode.SUBTRACT)


solid = part_3.part
